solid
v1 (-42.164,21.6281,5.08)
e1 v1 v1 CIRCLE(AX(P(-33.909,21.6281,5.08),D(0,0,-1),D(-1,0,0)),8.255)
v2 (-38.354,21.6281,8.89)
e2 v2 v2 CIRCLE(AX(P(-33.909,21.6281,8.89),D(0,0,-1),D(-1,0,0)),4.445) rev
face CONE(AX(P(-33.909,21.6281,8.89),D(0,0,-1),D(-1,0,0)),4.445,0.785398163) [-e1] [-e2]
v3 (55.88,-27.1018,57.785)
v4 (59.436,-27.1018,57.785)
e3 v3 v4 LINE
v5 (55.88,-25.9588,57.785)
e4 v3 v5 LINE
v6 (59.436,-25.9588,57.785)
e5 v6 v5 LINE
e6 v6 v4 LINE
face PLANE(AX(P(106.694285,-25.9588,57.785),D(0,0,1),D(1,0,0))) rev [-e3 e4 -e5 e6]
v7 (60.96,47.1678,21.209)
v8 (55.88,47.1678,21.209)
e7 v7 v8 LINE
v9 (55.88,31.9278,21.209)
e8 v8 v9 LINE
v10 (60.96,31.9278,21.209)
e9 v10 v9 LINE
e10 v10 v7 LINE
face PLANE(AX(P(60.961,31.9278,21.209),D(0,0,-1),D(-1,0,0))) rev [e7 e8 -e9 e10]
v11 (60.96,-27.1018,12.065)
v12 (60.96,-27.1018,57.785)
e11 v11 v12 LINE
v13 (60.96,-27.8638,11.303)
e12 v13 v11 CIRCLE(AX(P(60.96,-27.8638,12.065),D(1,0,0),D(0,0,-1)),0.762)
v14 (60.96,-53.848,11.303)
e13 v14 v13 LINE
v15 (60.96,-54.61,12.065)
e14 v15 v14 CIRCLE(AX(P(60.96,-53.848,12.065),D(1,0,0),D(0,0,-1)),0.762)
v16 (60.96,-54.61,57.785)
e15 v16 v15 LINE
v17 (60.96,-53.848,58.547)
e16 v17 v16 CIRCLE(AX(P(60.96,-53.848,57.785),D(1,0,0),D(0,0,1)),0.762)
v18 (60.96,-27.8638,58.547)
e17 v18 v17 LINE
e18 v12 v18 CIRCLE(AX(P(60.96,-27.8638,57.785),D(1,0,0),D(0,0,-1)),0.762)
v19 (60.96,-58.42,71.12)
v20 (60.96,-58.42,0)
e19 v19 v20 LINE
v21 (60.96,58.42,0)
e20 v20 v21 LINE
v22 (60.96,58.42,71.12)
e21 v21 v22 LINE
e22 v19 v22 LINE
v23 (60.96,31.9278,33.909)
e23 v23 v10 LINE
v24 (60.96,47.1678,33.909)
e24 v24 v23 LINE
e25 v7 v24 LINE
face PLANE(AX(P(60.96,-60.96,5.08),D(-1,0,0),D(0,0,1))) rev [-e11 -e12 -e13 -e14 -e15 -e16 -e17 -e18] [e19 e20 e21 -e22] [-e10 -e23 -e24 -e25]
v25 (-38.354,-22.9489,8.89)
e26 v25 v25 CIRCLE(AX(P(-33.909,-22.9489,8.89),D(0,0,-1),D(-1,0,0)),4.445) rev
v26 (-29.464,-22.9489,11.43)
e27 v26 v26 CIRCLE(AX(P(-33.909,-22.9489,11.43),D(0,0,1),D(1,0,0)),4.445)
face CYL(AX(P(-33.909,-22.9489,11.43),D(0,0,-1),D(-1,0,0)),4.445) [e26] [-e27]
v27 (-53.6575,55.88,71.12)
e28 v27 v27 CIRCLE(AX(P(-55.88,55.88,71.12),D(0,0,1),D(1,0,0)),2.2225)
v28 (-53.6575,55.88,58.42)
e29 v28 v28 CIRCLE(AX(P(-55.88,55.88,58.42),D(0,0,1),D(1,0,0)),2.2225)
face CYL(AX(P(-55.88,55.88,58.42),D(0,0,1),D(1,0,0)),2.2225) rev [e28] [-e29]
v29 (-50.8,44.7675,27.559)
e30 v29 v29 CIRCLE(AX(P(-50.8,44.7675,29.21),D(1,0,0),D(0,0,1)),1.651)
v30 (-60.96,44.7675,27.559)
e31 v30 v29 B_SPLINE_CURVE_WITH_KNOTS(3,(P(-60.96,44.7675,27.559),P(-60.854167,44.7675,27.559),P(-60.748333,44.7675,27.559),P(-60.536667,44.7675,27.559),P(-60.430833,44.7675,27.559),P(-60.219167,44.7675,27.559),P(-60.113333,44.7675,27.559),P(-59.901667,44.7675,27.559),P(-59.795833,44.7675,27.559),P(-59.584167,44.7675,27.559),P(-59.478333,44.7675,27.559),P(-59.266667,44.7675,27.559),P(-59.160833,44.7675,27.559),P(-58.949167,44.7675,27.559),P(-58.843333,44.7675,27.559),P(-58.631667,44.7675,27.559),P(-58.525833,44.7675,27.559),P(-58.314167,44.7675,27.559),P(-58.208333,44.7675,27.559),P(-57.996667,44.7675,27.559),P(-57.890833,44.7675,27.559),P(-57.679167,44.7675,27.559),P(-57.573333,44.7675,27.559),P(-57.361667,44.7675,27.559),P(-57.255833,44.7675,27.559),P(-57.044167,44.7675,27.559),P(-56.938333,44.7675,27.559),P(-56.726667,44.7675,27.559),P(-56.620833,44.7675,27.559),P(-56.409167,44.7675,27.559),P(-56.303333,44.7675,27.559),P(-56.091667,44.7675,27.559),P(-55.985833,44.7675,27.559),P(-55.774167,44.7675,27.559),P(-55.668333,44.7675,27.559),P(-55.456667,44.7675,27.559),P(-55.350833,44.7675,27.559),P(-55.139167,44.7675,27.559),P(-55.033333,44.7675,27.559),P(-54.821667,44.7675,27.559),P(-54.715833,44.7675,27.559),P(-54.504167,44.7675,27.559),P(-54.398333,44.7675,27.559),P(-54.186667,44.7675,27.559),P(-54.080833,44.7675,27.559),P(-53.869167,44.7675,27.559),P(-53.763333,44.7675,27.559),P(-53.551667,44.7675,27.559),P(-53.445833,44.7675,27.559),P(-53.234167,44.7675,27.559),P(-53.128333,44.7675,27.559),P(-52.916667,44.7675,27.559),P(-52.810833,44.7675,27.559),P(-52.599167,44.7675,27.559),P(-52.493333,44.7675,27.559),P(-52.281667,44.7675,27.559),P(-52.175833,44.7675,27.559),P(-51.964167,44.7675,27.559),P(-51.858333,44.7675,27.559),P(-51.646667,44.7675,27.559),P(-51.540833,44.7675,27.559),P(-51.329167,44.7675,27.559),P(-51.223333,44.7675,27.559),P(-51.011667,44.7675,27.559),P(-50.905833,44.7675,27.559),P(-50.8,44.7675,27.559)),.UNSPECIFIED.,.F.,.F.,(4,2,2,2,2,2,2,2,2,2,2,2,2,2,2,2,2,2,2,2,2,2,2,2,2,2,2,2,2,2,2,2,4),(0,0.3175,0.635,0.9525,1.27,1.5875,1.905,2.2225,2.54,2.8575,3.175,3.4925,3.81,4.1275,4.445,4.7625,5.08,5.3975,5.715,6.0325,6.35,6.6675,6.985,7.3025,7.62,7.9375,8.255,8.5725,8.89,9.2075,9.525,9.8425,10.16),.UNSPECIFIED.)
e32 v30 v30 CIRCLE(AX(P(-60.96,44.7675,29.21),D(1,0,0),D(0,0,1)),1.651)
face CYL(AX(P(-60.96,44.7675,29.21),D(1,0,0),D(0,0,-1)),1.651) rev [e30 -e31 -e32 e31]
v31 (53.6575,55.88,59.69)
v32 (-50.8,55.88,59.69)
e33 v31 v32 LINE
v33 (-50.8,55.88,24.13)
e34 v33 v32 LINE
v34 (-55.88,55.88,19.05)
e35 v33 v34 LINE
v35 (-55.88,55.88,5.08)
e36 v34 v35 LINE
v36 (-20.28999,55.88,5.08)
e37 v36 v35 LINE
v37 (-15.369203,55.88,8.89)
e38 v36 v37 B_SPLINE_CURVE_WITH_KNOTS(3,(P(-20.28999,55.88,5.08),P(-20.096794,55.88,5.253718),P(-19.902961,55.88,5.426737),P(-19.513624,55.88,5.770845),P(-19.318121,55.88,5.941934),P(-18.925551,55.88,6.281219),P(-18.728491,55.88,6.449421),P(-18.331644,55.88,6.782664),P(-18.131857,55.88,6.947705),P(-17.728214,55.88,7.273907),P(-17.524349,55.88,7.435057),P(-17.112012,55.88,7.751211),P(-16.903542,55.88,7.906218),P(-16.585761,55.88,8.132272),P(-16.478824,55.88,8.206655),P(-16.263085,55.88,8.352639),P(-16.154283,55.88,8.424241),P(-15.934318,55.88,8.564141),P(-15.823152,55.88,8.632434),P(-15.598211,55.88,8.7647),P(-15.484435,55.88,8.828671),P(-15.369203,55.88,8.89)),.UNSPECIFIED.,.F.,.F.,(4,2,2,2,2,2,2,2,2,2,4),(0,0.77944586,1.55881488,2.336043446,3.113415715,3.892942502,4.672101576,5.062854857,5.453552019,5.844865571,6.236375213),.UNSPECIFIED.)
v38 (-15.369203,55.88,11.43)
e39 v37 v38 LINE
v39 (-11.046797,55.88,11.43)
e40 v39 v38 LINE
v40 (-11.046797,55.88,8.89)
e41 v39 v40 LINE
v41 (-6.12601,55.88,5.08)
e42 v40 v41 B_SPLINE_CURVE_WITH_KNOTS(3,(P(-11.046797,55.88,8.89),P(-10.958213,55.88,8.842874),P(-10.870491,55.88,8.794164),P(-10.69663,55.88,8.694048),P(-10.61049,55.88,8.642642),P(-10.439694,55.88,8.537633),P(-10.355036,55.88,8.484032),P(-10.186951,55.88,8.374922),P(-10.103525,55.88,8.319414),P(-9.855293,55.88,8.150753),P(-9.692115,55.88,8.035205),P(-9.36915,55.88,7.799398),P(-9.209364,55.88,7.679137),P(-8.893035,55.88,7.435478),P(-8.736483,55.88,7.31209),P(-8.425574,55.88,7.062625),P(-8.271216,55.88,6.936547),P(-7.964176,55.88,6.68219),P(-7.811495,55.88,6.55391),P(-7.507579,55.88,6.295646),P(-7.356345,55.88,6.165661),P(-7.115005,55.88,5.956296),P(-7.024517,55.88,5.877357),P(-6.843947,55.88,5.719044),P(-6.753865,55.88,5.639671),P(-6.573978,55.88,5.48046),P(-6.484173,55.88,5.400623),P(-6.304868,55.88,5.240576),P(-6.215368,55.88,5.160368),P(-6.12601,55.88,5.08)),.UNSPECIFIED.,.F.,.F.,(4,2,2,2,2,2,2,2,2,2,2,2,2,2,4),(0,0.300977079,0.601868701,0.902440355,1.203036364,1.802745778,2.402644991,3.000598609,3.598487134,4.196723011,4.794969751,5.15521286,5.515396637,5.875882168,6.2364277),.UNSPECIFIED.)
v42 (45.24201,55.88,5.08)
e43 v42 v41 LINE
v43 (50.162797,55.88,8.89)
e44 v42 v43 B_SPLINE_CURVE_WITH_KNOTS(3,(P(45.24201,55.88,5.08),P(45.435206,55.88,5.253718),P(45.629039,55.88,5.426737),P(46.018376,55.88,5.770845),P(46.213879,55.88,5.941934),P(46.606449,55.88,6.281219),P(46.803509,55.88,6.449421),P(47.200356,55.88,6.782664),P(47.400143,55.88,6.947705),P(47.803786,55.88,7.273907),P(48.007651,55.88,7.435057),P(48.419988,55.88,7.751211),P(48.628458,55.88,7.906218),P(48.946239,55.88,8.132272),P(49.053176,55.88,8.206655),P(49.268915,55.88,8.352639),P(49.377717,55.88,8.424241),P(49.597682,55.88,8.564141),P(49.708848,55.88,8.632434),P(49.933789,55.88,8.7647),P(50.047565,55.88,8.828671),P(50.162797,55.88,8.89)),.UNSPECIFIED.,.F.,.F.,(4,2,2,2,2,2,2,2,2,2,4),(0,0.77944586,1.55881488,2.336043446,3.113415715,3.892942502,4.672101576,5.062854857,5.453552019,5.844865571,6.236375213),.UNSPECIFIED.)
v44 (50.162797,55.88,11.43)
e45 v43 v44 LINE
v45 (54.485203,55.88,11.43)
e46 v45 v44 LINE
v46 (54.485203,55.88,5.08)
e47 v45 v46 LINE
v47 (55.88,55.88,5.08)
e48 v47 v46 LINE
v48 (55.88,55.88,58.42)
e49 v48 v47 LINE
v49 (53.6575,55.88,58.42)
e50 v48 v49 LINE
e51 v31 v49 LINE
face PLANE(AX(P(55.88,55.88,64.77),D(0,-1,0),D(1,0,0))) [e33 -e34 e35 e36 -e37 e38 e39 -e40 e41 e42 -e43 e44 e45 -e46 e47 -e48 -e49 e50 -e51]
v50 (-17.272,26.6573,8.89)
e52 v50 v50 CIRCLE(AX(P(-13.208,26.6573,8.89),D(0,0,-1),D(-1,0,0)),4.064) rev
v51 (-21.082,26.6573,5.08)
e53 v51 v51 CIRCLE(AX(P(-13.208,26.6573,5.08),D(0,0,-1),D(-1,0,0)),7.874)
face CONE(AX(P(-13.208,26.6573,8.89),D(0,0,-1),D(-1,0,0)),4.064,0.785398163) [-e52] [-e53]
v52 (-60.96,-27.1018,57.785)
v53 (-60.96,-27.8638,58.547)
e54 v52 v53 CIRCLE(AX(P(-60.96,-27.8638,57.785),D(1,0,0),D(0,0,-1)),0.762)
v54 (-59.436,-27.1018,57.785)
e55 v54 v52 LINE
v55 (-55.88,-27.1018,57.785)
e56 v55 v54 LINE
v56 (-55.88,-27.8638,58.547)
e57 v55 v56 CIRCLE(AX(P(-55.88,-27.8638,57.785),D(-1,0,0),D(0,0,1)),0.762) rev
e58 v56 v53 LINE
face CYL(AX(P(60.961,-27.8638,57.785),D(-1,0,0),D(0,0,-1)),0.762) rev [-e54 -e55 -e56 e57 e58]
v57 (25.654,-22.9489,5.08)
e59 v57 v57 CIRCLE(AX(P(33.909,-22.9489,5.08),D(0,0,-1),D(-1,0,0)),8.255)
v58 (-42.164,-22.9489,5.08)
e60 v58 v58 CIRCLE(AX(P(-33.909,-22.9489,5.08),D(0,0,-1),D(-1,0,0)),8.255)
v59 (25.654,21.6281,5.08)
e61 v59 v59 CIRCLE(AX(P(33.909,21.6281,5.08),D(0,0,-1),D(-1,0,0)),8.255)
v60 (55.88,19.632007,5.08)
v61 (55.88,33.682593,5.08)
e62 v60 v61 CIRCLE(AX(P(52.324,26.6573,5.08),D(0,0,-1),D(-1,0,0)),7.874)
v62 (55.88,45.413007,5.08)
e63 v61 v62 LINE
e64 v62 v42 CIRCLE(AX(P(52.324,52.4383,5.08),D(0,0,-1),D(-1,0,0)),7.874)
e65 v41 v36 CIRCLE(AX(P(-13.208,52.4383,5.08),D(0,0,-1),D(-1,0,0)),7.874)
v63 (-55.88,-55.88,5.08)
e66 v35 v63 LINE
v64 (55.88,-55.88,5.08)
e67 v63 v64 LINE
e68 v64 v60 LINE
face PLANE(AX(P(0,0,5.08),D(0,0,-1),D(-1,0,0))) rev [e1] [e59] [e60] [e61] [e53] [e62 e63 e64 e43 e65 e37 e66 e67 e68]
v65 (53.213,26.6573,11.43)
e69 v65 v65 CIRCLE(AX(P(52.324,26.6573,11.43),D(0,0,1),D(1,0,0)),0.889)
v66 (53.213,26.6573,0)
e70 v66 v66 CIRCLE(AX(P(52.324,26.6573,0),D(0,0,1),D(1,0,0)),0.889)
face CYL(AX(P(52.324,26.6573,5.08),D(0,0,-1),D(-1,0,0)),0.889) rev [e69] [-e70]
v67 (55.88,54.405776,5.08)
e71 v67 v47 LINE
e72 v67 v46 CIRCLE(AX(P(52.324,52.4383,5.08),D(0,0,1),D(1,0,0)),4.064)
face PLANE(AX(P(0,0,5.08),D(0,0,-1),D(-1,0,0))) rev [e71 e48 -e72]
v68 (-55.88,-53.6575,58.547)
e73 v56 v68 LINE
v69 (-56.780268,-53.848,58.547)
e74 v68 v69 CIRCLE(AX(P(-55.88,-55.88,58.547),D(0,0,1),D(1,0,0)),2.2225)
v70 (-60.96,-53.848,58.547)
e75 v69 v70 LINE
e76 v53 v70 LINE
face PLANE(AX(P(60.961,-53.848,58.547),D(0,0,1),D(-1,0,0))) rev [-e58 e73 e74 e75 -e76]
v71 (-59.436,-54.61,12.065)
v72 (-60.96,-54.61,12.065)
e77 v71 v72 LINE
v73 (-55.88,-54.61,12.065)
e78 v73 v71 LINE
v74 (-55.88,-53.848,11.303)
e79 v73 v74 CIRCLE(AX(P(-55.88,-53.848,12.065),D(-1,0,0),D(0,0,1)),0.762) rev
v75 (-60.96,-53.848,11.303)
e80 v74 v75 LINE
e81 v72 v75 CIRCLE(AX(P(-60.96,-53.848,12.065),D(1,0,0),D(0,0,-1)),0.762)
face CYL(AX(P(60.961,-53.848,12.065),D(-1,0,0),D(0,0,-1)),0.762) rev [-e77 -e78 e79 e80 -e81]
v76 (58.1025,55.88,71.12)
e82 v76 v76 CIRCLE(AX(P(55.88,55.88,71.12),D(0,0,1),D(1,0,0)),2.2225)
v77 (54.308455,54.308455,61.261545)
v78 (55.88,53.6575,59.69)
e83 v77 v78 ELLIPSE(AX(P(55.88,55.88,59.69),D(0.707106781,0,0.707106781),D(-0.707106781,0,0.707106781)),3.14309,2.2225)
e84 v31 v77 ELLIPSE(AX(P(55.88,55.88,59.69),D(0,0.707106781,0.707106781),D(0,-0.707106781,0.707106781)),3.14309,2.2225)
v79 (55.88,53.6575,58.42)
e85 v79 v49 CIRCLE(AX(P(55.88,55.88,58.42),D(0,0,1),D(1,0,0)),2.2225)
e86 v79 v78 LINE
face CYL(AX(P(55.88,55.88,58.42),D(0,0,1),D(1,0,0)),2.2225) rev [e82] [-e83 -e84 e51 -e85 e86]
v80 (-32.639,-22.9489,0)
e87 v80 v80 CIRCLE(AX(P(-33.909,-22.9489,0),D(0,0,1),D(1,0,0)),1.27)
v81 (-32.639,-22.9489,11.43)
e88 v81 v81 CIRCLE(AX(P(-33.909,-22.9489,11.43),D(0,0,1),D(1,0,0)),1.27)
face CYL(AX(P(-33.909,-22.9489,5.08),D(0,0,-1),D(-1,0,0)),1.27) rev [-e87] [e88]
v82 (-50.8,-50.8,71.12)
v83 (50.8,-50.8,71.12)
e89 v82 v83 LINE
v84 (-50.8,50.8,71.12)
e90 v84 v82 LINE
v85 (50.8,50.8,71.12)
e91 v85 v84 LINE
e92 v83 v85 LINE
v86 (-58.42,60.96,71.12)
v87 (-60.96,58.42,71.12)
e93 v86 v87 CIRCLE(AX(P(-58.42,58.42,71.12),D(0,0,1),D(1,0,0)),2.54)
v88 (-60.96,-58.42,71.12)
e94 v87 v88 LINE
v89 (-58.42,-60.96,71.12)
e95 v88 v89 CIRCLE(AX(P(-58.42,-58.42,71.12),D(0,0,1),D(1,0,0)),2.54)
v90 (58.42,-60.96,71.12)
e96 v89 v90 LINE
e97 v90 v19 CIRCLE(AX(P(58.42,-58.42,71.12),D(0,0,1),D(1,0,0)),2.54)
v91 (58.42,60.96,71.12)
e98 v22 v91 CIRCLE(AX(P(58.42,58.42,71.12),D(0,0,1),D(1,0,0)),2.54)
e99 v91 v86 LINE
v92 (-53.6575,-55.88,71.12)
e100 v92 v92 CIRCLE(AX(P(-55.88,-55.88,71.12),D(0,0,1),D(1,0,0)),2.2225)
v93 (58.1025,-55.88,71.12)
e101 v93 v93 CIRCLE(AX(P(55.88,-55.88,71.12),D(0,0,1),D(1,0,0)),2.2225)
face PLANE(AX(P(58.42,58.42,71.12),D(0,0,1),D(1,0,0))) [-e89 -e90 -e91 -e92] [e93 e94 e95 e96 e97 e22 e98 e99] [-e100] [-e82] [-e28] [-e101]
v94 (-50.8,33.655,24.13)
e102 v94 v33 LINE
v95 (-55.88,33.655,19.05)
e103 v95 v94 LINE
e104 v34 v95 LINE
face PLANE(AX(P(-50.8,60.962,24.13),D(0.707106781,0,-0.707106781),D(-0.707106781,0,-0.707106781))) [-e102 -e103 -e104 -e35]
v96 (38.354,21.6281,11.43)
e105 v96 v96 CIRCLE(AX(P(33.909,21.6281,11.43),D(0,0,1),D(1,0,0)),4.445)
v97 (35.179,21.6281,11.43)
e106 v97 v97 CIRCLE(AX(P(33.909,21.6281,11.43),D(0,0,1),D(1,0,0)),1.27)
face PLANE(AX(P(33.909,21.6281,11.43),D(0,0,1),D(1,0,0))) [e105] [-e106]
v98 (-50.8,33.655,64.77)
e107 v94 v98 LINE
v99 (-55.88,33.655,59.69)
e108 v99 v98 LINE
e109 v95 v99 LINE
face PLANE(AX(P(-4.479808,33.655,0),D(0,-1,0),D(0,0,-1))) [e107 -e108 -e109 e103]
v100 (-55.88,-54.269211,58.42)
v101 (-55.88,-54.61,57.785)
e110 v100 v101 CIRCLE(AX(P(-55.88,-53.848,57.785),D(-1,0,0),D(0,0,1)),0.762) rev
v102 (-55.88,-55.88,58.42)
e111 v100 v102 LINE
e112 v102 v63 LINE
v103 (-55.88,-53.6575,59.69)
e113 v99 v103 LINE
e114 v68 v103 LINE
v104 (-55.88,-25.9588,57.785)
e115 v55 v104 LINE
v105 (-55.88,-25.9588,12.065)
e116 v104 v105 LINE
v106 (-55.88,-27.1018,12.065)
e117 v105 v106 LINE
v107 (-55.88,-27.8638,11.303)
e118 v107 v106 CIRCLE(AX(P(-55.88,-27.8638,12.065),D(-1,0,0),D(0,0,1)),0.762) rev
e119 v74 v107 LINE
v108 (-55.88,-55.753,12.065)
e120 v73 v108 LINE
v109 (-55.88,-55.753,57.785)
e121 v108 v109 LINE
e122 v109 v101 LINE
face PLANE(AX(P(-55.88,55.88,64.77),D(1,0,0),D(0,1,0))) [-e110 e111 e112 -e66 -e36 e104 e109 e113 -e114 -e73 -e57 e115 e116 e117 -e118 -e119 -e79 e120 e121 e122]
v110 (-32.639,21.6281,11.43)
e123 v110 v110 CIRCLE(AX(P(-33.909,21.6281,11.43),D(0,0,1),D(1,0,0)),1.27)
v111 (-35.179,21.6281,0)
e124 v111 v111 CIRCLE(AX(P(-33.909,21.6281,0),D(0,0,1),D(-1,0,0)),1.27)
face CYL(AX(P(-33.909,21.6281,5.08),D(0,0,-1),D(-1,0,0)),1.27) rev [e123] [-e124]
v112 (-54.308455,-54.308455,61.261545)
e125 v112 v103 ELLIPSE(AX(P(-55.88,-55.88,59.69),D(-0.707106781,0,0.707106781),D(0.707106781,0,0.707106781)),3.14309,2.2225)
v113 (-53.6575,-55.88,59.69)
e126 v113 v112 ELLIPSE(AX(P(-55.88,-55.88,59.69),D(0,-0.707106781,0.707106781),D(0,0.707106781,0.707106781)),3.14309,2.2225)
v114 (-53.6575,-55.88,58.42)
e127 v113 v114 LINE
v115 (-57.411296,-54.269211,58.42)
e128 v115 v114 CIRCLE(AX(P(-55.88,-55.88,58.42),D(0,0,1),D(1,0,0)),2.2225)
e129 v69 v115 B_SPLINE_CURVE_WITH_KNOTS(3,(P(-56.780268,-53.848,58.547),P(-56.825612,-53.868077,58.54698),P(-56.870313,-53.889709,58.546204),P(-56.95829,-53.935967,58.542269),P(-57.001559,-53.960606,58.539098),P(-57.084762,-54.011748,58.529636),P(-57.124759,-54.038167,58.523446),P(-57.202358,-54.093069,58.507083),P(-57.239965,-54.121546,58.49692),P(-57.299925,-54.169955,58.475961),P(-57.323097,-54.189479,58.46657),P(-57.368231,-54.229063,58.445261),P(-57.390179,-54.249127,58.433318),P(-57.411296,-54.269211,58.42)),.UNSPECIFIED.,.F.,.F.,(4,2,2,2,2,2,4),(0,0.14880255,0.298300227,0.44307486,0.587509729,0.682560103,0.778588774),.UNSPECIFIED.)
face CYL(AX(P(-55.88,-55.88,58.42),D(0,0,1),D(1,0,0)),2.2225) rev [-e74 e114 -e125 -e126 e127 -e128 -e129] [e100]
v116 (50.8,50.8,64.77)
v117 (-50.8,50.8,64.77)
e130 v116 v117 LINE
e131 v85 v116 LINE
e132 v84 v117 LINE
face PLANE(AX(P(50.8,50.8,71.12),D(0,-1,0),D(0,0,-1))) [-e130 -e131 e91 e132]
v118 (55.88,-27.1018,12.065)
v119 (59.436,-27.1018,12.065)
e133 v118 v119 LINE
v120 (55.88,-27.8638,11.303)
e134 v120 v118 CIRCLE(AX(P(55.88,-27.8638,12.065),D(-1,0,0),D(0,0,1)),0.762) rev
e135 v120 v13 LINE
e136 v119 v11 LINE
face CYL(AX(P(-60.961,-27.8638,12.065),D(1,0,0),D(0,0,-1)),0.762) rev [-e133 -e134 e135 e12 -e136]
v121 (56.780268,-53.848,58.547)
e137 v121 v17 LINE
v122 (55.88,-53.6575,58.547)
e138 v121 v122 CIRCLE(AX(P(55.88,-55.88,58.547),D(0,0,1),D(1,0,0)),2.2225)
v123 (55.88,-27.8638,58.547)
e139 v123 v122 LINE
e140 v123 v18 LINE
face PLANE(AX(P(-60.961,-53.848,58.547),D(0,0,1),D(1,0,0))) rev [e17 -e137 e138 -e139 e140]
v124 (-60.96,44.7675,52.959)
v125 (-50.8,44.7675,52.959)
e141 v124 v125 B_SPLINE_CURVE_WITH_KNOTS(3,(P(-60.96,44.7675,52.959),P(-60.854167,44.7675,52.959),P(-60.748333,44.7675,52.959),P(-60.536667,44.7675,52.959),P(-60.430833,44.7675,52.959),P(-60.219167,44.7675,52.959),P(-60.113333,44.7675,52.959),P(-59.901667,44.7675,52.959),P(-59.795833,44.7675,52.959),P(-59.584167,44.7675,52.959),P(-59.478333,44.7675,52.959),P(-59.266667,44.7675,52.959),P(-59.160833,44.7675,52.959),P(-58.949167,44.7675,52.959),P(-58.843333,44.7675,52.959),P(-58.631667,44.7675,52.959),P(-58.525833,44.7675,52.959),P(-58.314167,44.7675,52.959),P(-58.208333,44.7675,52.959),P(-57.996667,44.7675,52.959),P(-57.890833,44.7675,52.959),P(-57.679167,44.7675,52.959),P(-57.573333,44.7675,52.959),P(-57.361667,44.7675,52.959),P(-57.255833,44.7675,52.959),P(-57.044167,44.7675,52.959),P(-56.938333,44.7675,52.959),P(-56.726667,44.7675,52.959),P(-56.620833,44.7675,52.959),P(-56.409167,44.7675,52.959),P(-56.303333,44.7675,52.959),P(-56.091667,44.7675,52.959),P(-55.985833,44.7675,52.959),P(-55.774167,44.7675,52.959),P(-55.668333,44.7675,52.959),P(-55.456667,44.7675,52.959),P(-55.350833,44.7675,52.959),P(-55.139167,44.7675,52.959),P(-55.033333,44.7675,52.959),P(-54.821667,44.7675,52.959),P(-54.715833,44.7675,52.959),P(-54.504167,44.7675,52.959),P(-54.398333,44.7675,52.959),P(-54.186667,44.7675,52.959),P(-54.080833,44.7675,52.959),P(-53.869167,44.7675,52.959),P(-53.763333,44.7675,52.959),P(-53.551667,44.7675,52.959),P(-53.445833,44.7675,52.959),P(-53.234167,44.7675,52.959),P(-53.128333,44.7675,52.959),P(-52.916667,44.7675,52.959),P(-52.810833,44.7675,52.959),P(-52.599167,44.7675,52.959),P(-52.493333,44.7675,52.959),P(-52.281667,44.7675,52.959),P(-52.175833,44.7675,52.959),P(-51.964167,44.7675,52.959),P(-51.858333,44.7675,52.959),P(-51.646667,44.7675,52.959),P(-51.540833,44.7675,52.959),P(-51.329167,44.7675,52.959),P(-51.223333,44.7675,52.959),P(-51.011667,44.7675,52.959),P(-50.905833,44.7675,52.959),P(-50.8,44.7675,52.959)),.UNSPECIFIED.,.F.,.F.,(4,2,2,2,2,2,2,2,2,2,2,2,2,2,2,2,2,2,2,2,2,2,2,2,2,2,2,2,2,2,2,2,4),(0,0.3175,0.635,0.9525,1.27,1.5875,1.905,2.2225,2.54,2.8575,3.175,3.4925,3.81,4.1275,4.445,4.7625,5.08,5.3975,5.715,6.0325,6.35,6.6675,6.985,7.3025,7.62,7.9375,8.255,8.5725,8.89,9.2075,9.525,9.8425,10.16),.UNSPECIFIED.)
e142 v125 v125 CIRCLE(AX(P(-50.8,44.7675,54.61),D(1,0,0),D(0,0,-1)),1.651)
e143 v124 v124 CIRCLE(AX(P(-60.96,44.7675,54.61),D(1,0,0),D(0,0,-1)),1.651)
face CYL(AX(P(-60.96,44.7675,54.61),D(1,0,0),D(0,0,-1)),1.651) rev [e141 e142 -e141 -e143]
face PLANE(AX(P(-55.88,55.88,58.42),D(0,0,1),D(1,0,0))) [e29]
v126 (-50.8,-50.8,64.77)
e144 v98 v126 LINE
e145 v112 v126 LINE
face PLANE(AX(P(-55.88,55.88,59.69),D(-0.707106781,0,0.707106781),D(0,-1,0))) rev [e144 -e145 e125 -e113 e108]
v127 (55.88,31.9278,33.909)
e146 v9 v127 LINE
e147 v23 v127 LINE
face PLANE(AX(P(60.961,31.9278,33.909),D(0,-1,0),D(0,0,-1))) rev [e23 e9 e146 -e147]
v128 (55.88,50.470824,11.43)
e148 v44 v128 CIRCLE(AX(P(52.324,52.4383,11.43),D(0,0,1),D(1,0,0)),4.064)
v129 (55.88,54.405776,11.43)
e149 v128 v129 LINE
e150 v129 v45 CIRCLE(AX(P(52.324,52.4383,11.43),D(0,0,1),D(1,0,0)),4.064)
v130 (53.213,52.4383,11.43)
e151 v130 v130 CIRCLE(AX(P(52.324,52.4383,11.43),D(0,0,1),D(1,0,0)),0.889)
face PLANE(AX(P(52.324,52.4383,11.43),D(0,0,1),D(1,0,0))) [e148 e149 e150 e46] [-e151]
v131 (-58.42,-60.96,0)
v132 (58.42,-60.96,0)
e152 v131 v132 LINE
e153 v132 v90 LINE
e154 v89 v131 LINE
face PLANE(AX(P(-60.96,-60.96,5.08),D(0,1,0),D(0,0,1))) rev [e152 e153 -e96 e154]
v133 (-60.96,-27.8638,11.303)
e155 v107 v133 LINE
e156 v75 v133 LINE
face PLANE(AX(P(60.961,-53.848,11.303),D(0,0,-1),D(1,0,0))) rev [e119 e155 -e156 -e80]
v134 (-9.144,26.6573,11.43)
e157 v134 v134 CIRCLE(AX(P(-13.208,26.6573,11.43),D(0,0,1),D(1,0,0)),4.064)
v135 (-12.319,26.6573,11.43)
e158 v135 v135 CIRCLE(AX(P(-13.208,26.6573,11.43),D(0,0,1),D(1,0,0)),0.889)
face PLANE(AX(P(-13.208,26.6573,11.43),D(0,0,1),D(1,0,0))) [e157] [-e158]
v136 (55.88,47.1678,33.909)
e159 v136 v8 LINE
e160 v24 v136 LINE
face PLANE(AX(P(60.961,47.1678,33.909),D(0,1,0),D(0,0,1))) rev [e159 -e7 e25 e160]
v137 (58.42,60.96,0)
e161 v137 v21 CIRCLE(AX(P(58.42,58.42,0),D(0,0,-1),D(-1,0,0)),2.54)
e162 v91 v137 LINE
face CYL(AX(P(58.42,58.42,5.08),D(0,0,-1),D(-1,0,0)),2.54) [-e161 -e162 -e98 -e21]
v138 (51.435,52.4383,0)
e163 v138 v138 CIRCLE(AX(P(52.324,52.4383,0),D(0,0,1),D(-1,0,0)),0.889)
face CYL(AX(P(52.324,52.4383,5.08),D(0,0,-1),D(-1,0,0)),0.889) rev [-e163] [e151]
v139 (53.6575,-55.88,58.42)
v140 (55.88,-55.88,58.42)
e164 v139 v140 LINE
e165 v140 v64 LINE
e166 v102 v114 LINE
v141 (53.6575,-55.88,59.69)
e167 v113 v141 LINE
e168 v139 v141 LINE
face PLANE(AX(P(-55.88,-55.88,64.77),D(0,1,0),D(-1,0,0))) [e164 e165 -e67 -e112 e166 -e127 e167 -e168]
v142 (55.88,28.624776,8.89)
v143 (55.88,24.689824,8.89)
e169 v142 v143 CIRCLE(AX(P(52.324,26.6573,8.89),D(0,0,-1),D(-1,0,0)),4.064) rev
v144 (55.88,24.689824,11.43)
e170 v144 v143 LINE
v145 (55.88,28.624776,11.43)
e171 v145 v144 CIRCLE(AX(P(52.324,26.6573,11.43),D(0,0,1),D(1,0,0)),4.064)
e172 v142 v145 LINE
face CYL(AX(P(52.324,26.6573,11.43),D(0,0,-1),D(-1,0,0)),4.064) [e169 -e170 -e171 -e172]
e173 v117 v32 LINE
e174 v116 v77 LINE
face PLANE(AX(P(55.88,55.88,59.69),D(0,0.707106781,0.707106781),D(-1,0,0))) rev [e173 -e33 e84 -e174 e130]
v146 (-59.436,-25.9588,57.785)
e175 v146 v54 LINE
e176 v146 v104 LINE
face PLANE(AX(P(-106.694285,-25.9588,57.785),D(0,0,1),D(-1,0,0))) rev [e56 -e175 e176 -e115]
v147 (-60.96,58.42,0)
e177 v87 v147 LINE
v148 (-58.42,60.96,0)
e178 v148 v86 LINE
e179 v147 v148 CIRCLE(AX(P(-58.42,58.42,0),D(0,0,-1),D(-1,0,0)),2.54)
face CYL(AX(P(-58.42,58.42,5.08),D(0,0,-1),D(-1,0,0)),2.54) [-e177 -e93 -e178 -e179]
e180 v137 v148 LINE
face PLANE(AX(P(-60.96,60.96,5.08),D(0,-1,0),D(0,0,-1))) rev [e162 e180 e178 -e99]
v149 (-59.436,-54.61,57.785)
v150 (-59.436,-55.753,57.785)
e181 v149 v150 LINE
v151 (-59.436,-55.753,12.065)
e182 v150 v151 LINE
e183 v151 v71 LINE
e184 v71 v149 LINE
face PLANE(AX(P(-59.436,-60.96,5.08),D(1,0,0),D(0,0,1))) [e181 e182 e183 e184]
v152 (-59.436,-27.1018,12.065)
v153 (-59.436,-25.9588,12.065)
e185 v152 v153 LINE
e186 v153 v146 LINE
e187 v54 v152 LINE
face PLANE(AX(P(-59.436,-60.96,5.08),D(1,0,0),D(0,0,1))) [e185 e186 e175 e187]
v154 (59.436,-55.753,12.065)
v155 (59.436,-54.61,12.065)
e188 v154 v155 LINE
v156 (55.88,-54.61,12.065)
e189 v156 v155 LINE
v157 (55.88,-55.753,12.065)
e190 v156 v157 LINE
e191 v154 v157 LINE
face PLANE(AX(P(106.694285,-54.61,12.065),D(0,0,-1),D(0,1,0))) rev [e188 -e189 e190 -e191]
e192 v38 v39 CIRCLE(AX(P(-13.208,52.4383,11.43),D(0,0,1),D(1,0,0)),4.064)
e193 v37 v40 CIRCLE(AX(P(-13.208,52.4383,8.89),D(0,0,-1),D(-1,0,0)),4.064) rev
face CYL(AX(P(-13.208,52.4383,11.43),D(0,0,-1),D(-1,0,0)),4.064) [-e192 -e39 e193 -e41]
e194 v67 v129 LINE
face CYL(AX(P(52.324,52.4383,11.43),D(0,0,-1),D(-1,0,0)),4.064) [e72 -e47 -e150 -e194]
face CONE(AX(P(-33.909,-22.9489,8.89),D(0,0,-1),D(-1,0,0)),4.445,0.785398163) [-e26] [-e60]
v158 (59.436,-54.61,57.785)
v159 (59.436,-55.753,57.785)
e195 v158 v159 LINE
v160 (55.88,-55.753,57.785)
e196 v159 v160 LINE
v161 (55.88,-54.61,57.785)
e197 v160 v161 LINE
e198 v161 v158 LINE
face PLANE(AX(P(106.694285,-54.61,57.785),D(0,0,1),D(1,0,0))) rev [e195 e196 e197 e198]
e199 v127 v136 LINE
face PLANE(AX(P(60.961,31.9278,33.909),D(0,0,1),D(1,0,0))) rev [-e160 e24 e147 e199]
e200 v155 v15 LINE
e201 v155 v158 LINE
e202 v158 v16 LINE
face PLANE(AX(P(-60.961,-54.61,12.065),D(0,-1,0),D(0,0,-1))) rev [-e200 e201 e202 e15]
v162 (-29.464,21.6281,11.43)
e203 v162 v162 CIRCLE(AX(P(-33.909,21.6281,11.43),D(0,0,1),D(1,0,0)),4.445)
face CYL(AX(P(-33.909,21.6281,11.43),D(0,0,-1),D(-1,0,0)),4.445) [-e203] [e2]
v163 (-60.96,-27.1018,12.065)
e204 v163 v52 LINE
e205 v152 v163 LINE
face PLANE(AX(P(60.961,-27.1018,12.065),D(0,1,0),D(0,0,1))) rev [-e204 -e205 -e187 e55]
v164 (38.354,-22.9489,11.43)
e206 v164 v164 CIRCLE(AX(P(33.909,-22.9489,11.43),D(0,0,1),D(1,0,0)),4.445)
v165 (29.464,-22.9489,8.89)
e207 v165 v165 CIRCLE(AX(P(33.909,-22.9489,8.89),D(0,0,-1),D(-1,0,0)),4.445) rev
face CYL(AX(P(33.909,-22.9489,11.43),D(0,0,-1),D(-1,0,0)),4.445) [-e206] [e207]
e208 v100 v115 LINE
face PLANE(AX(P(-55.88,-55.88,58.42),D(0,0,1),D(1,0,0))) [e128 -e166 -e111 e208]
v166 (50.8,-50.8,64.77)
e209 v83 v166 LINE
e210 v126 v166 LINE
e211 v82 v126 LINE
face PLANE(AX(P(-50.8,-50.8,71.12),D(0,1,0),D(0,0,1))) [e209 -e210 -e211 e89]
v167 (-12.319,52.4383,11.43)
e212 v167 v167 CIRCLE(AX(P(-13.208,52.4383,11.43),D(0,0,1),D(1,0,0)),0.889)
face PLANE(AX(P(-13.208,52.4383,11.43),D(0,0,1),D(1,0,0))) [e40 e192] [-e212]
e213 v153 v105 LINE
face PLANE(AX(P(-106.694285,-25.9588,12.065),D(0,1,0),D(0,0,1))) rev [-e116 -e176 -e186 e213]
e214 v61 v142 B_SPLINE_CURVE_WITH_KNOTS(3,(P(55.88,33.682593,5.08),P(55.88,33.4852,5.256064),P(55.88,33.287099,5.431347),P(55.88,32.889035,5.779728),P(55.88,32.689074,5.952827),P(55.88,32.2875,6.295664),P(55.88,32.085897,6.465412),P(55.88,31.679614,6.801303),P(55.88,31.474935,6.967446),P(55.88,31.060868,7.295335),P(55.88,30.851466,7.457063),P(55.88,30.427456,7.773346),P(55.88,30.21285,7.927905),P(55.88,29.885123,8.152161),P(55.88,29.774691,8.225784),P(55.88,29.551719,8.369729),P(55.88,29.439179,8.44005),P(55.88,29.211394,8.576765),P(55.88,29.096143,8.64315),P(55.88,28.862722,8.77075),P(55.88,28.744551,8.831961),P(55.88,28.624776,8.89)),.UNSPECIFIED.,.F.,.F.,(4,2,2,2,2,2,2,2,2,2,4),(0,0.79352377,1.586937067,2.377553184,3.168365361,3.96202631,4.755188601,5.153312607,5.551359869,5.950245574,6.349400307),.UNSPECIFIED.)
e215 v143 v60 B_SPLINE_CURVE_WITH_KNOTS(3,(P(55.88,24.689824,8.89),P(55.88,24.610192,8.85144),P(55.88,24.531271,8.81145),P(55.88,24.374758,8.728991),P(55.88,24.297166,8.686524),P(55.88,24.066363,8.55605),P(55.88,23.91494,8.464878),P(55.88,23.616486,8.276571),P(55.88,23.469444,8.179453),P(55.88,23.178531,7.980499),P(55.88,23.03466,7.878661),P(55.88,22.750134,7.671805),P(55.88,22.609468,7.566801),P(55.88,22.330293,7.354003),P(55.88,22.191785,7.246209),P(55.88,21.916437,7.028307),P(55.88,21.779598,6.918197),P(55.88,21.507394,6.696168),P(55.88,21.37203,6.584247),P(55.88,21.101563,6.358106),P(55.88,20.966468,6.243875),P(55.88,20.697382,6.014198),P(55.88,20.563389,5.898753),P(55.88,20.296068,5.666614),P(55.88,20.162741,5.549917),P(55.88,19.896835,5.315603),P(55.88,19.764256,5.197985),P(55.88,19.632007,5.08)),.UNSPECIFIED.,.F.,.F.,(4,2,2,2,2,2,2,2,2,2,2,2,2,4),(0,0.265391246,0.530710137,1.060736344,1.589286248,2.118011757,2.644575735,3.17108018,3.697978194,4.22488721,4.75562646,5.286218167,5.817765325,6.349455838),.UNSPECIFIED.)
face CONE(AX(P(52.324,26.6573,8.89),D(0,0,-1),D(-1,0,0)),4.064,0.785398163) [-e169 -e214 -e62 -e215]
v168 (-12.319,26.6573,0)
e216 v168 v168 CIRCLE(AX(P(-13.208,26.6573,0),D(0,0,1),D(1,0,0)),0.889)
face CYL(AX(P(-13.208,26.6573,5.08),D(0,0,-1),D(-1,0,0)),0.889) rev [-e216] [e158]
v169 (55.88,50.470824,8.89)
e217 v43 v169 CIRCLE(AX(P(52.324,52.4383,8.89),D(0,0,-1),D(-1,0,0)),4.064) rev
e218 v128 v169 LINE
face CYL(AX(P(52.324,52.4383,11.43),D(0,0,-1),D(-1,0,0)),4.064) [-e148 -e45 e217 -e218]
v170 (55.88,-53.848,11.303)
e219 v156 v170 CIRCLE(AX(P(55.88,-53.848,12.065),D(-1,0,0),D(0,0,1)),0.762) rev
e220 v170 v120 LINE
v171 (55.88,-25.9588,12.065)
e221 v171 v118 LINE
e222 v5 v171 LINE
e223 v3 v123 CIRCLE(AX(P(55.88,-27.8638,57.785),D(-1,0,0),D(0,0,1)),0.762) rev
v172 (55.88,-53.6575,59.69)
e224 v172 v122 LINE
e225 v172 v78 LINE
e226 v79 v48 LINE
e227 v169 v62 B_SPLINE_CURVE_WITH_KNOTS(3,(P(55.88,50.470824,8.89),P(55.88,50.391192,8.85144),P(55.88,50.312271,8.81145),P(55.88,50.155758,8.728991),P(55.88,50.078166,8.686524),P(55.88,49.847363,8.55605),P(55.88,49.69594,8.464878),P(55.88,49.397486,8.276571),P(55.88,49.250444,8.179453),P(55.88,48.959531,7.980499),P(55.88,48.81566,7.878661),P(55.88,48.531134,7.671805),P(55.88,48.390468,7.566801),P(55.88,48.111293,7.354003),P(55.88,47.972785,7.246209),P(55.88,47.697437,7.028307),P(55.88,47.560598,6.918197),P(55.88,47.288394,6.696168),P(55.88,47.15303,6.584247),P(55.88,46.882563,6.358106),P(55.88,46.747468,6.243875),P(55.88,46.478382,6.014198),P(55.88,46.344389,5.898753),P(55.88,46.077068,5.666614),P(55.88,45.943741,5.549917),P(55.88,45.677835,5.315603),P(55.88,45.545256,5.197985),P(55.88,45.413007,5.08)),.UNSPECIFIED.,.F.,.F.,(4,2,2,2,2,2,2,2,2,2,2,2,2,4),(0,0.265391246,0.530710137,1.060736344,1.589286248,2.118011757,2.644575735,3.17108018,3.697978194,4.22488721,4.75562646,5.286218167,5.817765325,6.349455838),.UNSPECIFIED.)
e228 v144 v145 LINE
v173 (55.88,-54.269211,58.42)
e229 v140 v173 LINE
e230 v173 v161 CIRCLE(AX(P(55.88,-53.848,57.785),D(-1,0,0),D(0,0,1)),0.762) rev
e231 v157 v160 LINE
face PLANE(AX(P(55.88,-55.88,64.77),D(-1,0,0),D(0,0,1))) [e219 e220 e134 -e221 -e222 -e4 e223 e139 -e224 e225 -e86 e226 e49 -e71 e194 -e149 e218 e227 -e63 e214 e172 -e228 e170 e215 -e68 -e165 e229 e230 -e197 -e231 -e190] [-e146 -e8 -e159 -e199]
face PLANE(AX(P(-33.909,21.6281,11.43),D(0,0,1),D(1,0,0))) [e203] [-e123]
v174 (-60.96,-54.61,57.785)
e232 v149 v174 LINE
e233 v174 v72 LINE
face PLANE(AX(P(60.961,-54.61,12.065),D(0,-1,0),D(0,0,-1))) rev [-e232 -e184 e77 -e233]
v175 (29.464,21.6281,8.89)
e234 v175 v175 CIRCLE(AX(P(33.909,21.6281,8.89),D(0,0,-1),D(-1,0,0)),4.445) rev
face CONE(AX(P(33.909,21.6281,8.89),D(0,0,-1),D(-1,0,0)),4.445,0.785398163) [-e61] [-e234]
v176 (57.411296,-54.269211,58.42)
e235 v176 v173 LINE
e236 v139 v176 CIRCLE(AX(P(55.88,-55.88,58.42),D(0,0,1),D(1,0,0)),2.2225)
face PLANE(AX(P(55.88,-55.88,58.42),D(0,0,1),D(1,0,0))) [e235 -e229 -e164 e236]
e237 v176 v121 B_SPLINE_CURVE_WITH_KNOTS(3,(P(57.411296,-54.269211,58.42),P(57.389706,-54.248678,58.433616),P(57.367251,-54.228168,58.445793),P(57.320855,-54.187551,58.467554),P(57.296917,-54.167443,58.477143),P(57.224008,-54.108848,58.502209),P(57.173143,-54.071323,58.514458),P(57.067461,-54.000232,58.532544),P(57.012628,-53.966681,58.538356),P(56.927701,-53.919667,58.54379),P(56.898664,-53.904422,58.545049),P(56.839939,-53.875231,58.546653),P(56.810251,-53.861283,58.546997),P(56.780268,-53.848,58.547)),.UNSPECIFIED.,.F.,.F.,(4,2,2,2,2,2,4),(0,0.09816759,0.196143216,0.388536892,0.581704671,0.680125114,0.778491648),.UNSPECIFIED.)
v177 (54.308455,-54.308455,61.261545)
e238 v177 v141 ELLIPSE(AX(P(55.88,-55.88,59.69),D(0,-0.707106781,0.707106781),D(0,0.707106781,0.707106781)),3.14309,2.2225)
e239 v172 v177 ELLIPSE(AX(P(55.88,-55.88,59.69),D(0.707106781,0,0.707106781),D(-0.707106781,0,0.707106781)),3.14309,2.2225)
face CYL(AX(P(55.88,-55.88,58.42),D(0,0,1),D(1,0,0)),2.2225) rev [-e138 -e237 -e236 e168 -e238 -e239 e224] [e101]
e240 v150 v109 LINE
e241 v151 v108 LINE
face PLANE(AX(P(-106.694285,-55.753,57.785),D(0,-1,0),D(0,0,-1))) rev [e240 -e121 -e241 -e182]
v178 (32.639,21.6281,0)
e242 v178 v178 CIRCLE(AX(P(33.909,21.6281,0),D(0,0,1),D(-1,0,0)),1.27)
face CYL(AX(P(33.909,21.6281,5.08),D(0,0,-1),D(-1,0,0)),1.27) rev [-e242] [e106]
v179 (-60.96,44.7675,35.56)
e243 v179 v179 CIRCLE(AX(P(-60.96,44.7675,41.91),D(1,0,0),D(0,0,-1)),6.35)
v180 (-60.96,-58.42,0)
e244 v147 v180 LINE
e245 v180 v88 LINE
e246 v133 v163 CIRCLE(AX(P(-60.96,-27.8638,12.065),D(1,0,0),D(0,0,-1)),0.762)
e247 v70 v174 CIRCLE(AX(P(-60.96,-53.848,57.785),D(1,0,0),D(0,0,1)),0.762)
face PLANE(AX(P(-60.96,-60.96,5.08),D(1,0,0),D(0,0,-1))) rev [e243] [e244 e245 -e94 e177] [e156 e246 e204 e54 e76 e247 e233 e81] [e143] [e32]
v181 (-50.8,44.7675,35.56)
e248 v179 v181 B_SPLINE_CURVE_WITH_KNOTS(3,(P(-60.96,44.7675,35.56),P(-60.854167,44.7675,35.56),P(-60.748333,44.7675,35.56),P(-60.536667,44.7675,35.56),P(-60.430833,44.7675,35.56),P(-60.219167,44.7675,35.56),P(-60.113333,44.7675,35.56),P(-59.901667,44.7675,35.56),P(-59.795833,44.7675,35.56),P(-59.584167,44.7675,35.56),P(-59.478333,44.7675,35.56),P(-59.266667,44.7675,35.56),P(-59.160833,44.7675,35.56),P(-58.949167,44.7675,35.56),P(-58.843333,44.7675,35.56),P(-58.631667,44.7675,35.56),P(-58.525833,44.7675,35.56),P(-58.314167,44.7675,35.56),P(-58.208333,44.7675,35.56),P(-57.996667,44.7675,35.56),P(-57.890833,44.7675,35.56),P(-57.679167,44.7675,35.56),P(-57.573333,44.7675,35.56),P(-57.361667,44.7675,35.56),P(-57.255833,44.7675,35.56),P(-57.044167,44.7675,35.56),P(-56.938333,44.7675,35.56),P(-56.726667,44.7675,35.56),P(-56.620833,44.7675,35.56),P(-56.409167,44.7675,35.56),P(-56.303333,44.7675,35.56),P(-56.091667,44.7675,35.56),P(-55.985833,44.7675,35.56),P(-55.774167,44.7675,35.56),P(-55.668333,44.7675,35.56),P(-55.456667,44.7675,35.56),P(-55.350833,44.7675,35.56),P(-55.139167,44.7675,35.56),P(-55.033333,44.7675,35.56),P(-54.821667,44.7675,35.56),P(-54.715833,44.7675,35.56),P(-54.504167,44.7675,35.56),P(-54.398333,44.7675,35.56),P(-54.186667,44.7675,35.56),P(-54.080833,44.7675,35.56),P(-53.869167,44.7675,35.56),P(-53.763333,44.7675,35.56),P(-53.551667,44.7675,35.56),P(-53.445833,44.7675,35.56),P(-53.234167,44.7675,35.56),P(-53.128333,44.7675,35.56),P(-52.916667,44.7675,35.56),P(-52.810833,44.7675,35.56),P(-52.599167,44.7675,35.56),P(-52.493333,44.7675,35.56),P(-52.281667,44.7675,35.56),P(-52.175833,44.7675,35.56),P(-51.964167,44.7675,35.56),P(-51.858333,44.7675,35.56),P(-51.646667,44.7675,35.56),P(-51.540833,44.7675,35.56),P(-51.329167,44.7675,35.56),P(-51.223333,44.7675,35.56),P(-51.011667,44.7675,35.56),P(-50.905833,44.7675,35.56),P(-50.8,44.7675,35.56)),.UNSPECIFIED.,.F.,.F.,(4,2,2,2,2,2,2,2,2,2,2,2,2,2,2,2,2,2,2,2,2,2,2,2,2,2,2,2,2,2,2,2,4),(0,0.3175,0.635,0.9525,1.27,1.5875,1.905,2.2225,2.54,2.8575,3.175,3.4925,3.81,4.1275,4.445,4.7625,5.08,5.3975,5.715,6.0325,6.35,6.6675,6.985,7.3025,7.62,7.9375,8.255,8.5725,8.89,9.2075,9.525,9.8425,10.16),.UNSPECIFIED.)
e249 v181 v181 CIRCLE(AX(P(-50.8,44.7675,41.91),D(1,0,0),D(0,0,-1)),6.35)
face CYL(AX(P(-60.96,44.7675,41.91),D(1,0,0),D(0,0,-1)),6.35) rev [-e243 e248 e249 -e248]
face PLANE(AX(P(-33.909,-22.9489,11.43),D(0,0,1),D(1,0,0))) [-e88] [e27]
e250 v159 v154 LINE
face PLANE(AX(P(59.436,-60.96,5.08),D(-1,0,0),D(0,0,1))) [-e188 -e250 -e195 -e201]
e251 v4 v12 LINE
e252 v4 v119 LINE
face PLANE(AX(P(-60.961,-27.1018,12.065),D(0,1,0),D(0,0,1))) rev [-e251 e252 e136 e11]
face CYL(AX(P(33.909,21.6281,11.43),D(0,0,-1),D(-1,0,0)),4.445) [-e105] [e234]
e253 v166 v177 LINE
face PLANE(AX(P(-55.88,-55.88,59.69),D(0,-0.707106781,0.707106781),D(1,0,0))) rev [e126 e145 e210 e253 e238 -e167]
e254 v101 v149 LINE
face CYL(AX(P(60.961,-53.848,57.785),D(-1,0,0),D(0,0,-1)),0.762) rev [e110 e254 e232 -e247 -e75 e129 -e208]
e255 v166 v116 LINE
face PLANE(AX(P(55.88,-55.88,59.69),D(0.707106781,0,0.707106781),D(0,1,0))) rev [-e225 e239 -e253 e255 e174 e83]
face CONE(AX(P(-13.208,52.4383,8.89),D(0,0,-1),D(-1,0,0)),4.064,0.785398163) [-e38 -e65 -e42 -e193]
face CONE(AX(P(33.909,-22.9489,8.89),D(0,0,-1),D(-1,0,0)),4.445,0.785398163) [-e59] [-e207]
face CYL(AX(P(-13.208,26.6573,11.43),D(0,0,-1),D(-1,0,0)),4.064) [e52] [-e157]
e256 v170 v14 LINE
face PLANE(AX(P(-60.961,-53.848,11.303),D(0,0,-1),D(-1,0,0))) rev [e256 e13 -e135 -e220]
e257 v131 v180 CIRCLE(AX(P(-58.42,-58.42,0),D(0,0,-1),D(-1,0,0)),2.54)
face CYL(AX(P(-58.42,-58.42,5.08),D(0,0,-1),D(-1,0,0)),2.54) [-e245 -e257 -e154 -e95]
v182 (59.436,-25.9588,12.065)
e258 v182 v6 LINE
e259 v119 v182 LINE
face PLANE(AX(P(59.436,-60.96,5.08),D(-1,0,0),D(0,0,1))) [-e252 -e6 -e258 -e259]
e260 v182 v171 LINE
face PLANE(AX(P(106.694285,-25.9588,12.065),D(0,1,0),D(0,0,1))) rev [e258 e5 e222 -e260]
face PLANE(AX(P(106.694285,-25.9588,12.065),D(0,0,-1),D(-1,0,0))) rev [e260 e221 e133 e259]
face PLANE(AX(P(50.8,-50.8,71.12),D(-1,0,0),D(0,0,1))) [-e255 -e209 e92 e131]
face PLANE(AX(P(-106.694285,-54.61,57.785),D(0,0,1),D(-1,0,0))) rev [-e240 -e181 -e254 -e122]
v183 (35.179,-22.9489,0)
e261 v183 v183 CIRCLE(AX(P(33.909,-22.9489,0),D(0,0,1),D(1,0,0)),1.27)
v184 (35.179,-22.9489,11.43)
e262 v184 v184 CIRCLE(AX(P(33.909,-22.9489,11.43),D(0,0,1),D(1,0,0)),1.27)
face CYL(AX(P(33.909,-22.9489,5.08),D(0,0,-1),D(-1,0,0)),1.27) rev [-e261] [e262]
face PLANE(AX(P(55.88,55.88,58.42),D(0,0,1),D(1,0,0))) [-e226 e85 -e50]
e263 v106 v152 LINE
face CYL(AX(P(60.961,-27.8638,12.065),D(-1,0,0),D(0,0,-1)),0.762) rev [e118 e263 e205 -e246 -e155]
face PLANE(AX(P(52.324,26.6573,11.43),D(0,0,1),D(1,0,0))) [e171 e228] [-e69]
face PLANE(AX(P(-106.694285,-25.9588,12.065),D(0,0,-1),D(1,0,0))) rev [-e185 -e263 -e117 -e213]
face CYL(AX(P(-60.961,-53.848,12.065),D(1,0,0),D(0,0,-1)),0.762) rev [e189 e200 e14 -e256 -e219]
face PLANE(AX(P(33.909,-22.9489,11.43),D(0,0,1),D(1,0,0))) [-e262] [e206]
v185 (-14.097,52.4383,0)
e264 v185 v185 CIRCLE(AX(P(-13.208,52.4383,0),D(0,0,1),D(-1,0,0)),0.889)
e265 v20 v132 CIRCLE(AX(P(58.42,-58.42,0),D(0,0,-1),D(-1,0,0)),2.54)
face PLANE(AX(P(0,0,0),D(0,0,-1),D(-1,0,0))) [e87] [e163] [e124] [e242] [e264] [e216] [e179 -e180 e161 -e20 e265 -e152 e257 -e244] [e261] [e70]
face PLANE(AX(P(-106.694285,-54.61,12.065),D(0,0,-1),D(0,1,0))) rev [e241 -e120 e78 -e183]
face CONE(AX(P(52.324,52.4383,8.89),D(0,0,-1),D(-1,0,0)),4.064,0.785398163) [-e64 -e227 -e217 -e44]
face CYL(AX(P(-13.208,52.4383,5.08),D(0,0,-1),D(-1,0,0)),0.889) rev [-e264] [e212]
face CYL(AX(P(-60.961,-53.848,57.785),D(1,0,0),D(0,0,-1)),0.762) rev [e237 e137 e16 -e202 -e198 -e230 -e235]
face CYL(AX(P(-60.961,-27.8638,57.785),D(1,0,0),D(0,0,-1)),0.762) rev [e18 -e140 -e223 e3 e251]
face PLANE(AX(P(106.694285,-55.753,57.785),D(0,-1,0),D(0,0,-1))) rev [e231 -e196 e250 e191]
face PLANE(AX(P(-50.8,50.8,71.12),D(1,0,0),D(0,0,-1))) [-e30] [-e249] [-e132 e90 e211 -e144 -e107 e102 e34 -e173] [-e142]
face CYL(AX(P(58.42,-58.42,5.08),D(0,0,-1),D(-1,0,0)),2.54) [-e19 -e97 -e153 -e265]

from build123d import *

# Parameters (mm, degrees)
SKETCH1_W           = 121.92
SKETCH1_H           = 121.92
SKETCH1_R           = 1.27
SKETCH1_R_2         = 0.889
BOSS_EXTRUDE1_DEPTH = 5.08
FILLET1_R           = 2.54
BOSS_EXTRUDE2_START = 59.69
SKETCH3_W           = 111.76
SKETCH3_H           = 111.76
BOSS_EXTRUDE2_DEPTH = 59.69
SKETCH11_R          = 4.064
SKETCH11_R_2        = 0.889
SKETCH11_R_3        = 4.445
SKETCH11_R_4        = 1.27
BOSS_EXTRUDE5_DEPTH = 6.35
CUT_EXTRUDE1_REACH  = 152.916
SKETCH6_W           = 45.72
SKETCH6_H           = 1.143
CUT_EXTRUDE2_DEPTH  = 3.556
BOSS_EXTRUDE4_START = 6.35
SKETCH10_W          = 101.6
SKETCH10_H          = 101.6
BOSS_EXTRUDE4_DEPTH = 6.35
CHAMFER1_SIZE       = 5.08
CHAMFER2_SIZE       = 3.81
CUT_EXTRUDE3_REACH  = 151.752
SKETCH13_W          = 12.7
SKETCH13_H          = 15.24
SKETCH16_W          = 35.56
SKETCH16_H          = 22.225
SKETCH16_W_2        = 5.08
BOSS_EXTRUDE6_DEPTH = 5.08
BOSS_EXTRUDE7_REACH = 135.14
SKETCH18_R          = 6.35
SKETCH18_R_2        = 1.651
CUT_EXTRUDE4_DEPTH  = 146.823432959
SKETCH19_R          = 2.2225
CUT_EXTRUDE5_DEPTH  = 12.7


with BuildPart() as part:
    # Sketch1 → Boss-Extrude1 (new body)
    with BuildSketch(Plane.XY):
        Rectangle(SKETCH1_W, SKETCH1_H)
        with Locations((-33.909, -22.9489)):
            Circle(SKETCH1_R, mode=Mode.SUBTRACT)
        with Locations((33.909, -22.9489)):
            Circle(SKETCH1_R, mode=Mode.SUBTRACT)
        with Locations(Location((33.909, 21.6281, 0), (0, 0, 180))):
            Circle(SKETCH1_R, mode=Mode.SUBTRACT)
        with Locations(Location((-33.909, 21.6281, 0), (0, 0, 180))):
            Circle(SKETCH1_R, mode=Mode.SUBTRACT)
        with Locations((-13.208, 26.6573)):
            Circle(SKETCH1_R_2, mode=Mode.SUBTRACT)
        with Locations((52.324, 26.6573)):
            Circle(SKETCH1_R_2, mode=Mode.SUBTRACT)
        with Locations(Location((52.324, 52.4383, 0), (0, 0, 180))):
            Circle(SKETCH1_R_2, mode=Mode.SUBTRACT)
        with Locations(Location((-13.208, 52.4383, 0), (0, 0, 180))):
            Circle(SKETCH1_R_2, mode=Mode.SUBTRACT)
    extrude(amount=BOSS_EXTRUDE1_DEPTH)

    # Fillet1
    fillet1_edges = [part.edges().sort_by_distance(p)[0] for p in [
        (60.96, -60.96, 2.54),
        (-60.96, -60.96, 2.54),
        (-60.96, 60.96, 2.54),
        (60.96, 60.96, 2.54),
    ]]
    fillet(fillet1_edges, radius=FILLET1_R)

    # Sketch3 → Boss-Extrude2 (add)
    with BuildSketch(Plane.XY.offset(5.08).offset(BOSS_EXTRUDE2_START)):
        with BuildLine():
            Line((58.42, 60.96), (-58.42, 60.96))
            ThreePointArc((-58.42, 60.96), (-60.216051224, 60.216051224), (-60.96, 58.42))
            Line((-60.96, 58.42), (-60.96, -58.42))
            ThreePointArc((-60.96, -58.42), (-60.216051224, -60.216051224), (-58.42, -60.96))
            Line((-58.42, -60.96), (58.42, -60.96))
            ThreePointArc((58.42, -60.96), (60.216051224, -60.216051224), (60.96, -58.42))
            Line((60.96, -58.42), (60.96, 58.42))
            ThreePointArc((60.96, 58.42), (60.216051224, 60.216051224), (58.42, 60.96))
        make_face()
        Rectangle(SKETCH3_W, SKETCH3_H, mode=Mode.SUBTRACT)
    extrude(amount=-BOSS_EXTRUDE2_DEPTH)

    # Sketch11 → Boss-Extrude5 (add)
    # profile 1 of 8: a face of its own
    with BuildSketch(Plane.XY.offset(5.08)):
        with Locations((52.324, 52.4383)):
            Circle(SKETCH11_R)
        with Locations(Location((52.324, 52.4383, 0), (0, 0, 180))):
            Circle(SKETCH11_R_2, mode=Mode.SUBTRACT)
    # profile 2 of 8: a face of its own
    with BuildSketch(Plane.XY.offset(5.08)):
        with Locations((52.324, 26.6573)):
            Circle(SKETCH11_R)
        with Locations((52.324, 26.6573)):
            Circle(SKETCH11_R_2, mode=Mode.SUBTRACT)
    # profile 3 of 8: a face of its own
    with BuildSketch(Plane.XY.offset(5.08)):
        with Locations(Location((33.909, 21.6281, 0), (0, 0, 180))):
            Circle(SKETCH11_R_3)
        with Locations(Location((33.909, 21.6281, 0), (0, 0, 180))):
            Circle(SKETCH11_R_4, mode=Mode.SUBTRACT)
    # profile 4 of 8: a face of its own
    with BuildSketch(Plane.XY.offset(5.08)):
        with Locations((-13.208, 52.4383)):
            Circle(SKETCH11_R)
        with Locations(Location((-13.208, 52.4383, 0), (0, 0, 180))):
            Circle(SKETCH11_R_2, mode=Mode.SUBTRACT)
    # profile 5 of 8: a face of its own
    with BuildSketch(Plane.XY.offset(5.08)):
        with Locations(Location((-13.208, 26.6573, 0), (0, 0, 180))):
            Circle(SKETCH11_R)
        with Locations((-13.208, 26.6573)):
            Circle(SKETCH11_R_2, mode=Mode.SUBTRACT)
    # profile 6 of 8: a face of its own
    with BuildSketch(Plane.XY.offset(5.08)):
        with Locations(Location((-33.909, -22.9489, 0), (0, 0, 180))):
            Circle(SKETCH11_R_3)
        with Locations((-33.909, -22.9489)):
            Circle(SKETCH11_R_4, mode=Mode.SUBTRACT)
    # profile 7 of 8: a face of its own
    with BuildSketch(Plane.XY.offset(5.08)):
        with Locations(Location((-33.909, 21.6281, 0), (0, 0, 180))):
            Circle(SKETCH11_R_3)
        with Locations(Location((-33.909, 21.6281, 0), (0, 0, 180))):
            Circle(SKETCH11_R_4, mode=Mode.SUBTRACT)
    # profile 8 of 8: a face of its own
    with BuildSketch(Plane.XY.offset(5.08)):
        with Locations(Location((33.909, -22.9489, 0), (0, 0, 180))):
            Circle(SKETCH11_R_3)
        with Locations((33.909, -22.9489)):
            Circle(SKETCH11_R_4, mode=Mode.SUBTRACT)
    extrude(amount=BOSS_EXTRUDE5_DEPTH)

    # Sketch5 → Cut-Extrude1 (cut, up to next)
    with BuildSketch(Plane(origin=(60.96, 0, 0), x_dir=(0, 0, -1), z_dir=(1, 0, 0)), mode=Mode.PRIVATE) as cut_extrude1_sk1:
        with BuildLine():
            Line((-12.065, -54.61), (-57.785, -54.61))
            ThreePointArc((-57.785, -54.61), (-58.323815367, -54.386815367), (-58.547, -53.848))
            Line((-58.547, -53.848), (-58.547, -27.8638))
            ThreePointArc((-58.547, -27.8638), (-58.323815367, -27.324984633), (-57.785, -27.1018))
            Line((-57.785, -27.1018), (-12.065, -27.1018))
            ThreePointArc((-12.065, -27.1018), (-11.526184633, -27.324984633), (-11.303, -27.8638))
            Line((-11.303, -27.8638), (-11.303, -53.848))
            ThreePointArc((-11.303, -53.848), (-11.526184633, -54.386815367), (-12.065, -54.61))
        make_face()
    cut_extrude1_tool1 = extrude(cut_extrude1_sk1.sketch, amount=-CUT_EXTRUDE1_REACH, mode=Mode.PRIVATE) & part.part
    cut_extrude1 = cut_extrude1_tool1.solids().sort_by_distance((60.96, -40.8559, 34.925))[0]
    add(cut_extrude1, mode=Mode.SUBTRACT)

    # Sketch6 → Cut-Extrude2 (cut)
    with BuildSketch(Plane.ZY.offset(-55.88)):
        with Locations((34.925, -55.1815)):
            Rectangle(SKETCH6_W, SKETCH6_H)
        with Locations((34.925, -26.5303)):
            Rectangle(SKETCH6_W, SKETCH6_H)
    cut_extrude2 = extrude(amount=-CUT_EXTRUDE2_DEPTH, mode=Mode.SUBTRACT)

    # Mirror2: Cut-Extrude1, Cut-Extrude2 across plane
    add(cut_extrude1.mirror(Plane(origin=(0, 0, 0), x_dir=(0, 0, 1), z_dir=(1, 0, 0))), mode=Mode.SUBTRACT)
    add(cut_extrude2.mirror(Plane(origin=(0, 0, 0), x_dir=(0, 0, 1), z_dir=(1, 0, 0))), mode=Mode.SUBTRACT)

    # Sketch10 → Boss-Extrude4 (add)
    with BuildSketch(Plane.XY.offset(64.77).offset(BOSS_EXTRUDE4_START)):
        with BuildLine():
            Line((58.42, 60.96), (-58.42, 60.96))
            ThreePointArc((-58.42, 60.96), (-60.216051224, 60.216051224), (-60.96, 58.42))
            Line((-60.96, 58.42), (-60.96, -58.42))
            ThreePointArc((-60.96, -58.42), (-60.216051224, -60.216051224), (-58.42, -60.96))
            Line((-58.42, -60.96), (58.42, -60.96))
            ThreePointArc((58.42, -60.96), (60.216051224, -60.216051224), (60.96, -58.42))
            Line((60.96, -58.42), (60.96, 58.42))
            ThreePointArc((60.96, 58.42), (60.216051224, 60.216051224), (58.42, 60.96))
        make_face()
        Rectangle(SKETCH10_W, SKETCH10_H, mode=Mode.SUBTRACT)
    extrude(amount=-BOSS_EXTRUDE4_DEPTH)

    # Chamfer1
    chamfer1_edges = [part.edges().sort_by_distance(p)[0] for p in [
        (55.88, 0, 64.77),
        (0, 55.88, 64.77),
        (-55.88, 0, 64.77),
        (0, -55.88, 64.77),
    ]]
    chamfer(chamfer1_edges, length=CHAMFER1_SIZE - 0.0001)  # a hair under: the kernel refuses the full size

    # Chamfer2
    chamfer2_edges = [part.edges().sort_by_distance(p)[0] for p in [
        (49.530944347, 49.486192936, 5.08),
        (48.26, 26.6573, 5.08),
        (38.354, 21.6281, 5.08),
        (-13.208, 48.3743, 5.08),
        (-9.144, 26.6573, 5.08),
        (-29.464, -22.9489, 5.08),
        (-29.464, 21.6281, 5.08),
        (38.354, -22.9489, 5.08),
    ]]
    chamfer(chamfer2_edges, length=CHAMFER2_SIZE)

    # Sketch13 → Cut-Extrude3 (cut, up to next)
    with BuildSketch(Plane.ZY.offset(-55.88), mode=Mode.PRIVATE) as cut_extrude3_sk1:
        with Locations((27.559, 39.5478)):
            Rectangle(SKETCH13_W, SKETCH13_H)
    cut_extrude3_tool1 = extrude(cut_extrude3_sk1.sketch, amount=-CUT_EXTRUDE3_REACH, mode=Mode.PRIVATE) & part.part
    add(cut_extrude3_tool1.solids().sort_by_distance((55.88, 39.5478, 27.559))[0], mode=Mode.SUBTRACT)

    # Sketch16 → Boss-Extrude6 (add)
    with BuildSketch(Plane(origin=(-55.88, 0, 0), x_dir=(0, 0, -1), z_dir=(1, 0, 0))):
        with Locations((-41.91, 44.7675)):
            Rectangle(SKETCH16_W, SKETCH16_H)
        with Locations((-62.23, 44.7675)):
            Rectangle(SKETCH16_W_2, SKETCH16_H)
    extrude(amount=BOSS_EXTRUDE6_DEPTH)

    # Sketch17 → Boss-Extrude7 (add, up to next)
    with BuildSketch(Plane.XZ.offset(-33.655), mode=Mode.PRIVATE) as boss_extrude7_sk1:
        Polygon((-55.88, 24.13), (-55.88, 19.05), (-50.8, 24.13), align=None)
    boss_extrude7_tool1 = extrude(boss_extrude7_sk1.sketch, amount=-BOSS_EXTRUDE7_REACH, mode=Mode.PRIVATE) - part.part
    add(boss_extrude7_tool1.solids().sort_by_distance((-54.186667, 33.655, 22.436667))[0])

    # Sketch18 → Cut-Extrude4 (cut, through all)
    with BuildSketch(Plane(origin=(-50.8, 0, 0), x_dir=(0, 0, -1), z_dir=(1, 0, 0))):
        with Locations((-41.91, 44.7675)):
            Circle(SKETCH18_R)
        with Locations((-54.61, 44.7675)):
            Circle(SKETCH18_R_2)
        with Locations((-29.21, 44.7675)):
            Circle(SKETCH18_R_2)
    extrude(amount=-CUT_EXTRUDE4_DEPTH, mode=Mode.SUBTRACT)

    # Sketch19 → Cut-Extrude5 (cut)
    with BuildSketch(Plane.XY.offset(71.12)):
        with Locations((-55.88, -55.88)):
            Circle(SKETCH19_R)
        with Locations((-55.88, 55.88)):
            Circle(SKETCH19_R)
        with Locations((55.88, 55.88)):
            Circle(SKETCH19_R)
        with Locations((55.88, -55.88)):
            Circle(SKETCH19_R)
    extrude(amount=-CUT_EXTRUDE5_DEPTH, mode=Mode.SUBTRACT)


solid = part.part
